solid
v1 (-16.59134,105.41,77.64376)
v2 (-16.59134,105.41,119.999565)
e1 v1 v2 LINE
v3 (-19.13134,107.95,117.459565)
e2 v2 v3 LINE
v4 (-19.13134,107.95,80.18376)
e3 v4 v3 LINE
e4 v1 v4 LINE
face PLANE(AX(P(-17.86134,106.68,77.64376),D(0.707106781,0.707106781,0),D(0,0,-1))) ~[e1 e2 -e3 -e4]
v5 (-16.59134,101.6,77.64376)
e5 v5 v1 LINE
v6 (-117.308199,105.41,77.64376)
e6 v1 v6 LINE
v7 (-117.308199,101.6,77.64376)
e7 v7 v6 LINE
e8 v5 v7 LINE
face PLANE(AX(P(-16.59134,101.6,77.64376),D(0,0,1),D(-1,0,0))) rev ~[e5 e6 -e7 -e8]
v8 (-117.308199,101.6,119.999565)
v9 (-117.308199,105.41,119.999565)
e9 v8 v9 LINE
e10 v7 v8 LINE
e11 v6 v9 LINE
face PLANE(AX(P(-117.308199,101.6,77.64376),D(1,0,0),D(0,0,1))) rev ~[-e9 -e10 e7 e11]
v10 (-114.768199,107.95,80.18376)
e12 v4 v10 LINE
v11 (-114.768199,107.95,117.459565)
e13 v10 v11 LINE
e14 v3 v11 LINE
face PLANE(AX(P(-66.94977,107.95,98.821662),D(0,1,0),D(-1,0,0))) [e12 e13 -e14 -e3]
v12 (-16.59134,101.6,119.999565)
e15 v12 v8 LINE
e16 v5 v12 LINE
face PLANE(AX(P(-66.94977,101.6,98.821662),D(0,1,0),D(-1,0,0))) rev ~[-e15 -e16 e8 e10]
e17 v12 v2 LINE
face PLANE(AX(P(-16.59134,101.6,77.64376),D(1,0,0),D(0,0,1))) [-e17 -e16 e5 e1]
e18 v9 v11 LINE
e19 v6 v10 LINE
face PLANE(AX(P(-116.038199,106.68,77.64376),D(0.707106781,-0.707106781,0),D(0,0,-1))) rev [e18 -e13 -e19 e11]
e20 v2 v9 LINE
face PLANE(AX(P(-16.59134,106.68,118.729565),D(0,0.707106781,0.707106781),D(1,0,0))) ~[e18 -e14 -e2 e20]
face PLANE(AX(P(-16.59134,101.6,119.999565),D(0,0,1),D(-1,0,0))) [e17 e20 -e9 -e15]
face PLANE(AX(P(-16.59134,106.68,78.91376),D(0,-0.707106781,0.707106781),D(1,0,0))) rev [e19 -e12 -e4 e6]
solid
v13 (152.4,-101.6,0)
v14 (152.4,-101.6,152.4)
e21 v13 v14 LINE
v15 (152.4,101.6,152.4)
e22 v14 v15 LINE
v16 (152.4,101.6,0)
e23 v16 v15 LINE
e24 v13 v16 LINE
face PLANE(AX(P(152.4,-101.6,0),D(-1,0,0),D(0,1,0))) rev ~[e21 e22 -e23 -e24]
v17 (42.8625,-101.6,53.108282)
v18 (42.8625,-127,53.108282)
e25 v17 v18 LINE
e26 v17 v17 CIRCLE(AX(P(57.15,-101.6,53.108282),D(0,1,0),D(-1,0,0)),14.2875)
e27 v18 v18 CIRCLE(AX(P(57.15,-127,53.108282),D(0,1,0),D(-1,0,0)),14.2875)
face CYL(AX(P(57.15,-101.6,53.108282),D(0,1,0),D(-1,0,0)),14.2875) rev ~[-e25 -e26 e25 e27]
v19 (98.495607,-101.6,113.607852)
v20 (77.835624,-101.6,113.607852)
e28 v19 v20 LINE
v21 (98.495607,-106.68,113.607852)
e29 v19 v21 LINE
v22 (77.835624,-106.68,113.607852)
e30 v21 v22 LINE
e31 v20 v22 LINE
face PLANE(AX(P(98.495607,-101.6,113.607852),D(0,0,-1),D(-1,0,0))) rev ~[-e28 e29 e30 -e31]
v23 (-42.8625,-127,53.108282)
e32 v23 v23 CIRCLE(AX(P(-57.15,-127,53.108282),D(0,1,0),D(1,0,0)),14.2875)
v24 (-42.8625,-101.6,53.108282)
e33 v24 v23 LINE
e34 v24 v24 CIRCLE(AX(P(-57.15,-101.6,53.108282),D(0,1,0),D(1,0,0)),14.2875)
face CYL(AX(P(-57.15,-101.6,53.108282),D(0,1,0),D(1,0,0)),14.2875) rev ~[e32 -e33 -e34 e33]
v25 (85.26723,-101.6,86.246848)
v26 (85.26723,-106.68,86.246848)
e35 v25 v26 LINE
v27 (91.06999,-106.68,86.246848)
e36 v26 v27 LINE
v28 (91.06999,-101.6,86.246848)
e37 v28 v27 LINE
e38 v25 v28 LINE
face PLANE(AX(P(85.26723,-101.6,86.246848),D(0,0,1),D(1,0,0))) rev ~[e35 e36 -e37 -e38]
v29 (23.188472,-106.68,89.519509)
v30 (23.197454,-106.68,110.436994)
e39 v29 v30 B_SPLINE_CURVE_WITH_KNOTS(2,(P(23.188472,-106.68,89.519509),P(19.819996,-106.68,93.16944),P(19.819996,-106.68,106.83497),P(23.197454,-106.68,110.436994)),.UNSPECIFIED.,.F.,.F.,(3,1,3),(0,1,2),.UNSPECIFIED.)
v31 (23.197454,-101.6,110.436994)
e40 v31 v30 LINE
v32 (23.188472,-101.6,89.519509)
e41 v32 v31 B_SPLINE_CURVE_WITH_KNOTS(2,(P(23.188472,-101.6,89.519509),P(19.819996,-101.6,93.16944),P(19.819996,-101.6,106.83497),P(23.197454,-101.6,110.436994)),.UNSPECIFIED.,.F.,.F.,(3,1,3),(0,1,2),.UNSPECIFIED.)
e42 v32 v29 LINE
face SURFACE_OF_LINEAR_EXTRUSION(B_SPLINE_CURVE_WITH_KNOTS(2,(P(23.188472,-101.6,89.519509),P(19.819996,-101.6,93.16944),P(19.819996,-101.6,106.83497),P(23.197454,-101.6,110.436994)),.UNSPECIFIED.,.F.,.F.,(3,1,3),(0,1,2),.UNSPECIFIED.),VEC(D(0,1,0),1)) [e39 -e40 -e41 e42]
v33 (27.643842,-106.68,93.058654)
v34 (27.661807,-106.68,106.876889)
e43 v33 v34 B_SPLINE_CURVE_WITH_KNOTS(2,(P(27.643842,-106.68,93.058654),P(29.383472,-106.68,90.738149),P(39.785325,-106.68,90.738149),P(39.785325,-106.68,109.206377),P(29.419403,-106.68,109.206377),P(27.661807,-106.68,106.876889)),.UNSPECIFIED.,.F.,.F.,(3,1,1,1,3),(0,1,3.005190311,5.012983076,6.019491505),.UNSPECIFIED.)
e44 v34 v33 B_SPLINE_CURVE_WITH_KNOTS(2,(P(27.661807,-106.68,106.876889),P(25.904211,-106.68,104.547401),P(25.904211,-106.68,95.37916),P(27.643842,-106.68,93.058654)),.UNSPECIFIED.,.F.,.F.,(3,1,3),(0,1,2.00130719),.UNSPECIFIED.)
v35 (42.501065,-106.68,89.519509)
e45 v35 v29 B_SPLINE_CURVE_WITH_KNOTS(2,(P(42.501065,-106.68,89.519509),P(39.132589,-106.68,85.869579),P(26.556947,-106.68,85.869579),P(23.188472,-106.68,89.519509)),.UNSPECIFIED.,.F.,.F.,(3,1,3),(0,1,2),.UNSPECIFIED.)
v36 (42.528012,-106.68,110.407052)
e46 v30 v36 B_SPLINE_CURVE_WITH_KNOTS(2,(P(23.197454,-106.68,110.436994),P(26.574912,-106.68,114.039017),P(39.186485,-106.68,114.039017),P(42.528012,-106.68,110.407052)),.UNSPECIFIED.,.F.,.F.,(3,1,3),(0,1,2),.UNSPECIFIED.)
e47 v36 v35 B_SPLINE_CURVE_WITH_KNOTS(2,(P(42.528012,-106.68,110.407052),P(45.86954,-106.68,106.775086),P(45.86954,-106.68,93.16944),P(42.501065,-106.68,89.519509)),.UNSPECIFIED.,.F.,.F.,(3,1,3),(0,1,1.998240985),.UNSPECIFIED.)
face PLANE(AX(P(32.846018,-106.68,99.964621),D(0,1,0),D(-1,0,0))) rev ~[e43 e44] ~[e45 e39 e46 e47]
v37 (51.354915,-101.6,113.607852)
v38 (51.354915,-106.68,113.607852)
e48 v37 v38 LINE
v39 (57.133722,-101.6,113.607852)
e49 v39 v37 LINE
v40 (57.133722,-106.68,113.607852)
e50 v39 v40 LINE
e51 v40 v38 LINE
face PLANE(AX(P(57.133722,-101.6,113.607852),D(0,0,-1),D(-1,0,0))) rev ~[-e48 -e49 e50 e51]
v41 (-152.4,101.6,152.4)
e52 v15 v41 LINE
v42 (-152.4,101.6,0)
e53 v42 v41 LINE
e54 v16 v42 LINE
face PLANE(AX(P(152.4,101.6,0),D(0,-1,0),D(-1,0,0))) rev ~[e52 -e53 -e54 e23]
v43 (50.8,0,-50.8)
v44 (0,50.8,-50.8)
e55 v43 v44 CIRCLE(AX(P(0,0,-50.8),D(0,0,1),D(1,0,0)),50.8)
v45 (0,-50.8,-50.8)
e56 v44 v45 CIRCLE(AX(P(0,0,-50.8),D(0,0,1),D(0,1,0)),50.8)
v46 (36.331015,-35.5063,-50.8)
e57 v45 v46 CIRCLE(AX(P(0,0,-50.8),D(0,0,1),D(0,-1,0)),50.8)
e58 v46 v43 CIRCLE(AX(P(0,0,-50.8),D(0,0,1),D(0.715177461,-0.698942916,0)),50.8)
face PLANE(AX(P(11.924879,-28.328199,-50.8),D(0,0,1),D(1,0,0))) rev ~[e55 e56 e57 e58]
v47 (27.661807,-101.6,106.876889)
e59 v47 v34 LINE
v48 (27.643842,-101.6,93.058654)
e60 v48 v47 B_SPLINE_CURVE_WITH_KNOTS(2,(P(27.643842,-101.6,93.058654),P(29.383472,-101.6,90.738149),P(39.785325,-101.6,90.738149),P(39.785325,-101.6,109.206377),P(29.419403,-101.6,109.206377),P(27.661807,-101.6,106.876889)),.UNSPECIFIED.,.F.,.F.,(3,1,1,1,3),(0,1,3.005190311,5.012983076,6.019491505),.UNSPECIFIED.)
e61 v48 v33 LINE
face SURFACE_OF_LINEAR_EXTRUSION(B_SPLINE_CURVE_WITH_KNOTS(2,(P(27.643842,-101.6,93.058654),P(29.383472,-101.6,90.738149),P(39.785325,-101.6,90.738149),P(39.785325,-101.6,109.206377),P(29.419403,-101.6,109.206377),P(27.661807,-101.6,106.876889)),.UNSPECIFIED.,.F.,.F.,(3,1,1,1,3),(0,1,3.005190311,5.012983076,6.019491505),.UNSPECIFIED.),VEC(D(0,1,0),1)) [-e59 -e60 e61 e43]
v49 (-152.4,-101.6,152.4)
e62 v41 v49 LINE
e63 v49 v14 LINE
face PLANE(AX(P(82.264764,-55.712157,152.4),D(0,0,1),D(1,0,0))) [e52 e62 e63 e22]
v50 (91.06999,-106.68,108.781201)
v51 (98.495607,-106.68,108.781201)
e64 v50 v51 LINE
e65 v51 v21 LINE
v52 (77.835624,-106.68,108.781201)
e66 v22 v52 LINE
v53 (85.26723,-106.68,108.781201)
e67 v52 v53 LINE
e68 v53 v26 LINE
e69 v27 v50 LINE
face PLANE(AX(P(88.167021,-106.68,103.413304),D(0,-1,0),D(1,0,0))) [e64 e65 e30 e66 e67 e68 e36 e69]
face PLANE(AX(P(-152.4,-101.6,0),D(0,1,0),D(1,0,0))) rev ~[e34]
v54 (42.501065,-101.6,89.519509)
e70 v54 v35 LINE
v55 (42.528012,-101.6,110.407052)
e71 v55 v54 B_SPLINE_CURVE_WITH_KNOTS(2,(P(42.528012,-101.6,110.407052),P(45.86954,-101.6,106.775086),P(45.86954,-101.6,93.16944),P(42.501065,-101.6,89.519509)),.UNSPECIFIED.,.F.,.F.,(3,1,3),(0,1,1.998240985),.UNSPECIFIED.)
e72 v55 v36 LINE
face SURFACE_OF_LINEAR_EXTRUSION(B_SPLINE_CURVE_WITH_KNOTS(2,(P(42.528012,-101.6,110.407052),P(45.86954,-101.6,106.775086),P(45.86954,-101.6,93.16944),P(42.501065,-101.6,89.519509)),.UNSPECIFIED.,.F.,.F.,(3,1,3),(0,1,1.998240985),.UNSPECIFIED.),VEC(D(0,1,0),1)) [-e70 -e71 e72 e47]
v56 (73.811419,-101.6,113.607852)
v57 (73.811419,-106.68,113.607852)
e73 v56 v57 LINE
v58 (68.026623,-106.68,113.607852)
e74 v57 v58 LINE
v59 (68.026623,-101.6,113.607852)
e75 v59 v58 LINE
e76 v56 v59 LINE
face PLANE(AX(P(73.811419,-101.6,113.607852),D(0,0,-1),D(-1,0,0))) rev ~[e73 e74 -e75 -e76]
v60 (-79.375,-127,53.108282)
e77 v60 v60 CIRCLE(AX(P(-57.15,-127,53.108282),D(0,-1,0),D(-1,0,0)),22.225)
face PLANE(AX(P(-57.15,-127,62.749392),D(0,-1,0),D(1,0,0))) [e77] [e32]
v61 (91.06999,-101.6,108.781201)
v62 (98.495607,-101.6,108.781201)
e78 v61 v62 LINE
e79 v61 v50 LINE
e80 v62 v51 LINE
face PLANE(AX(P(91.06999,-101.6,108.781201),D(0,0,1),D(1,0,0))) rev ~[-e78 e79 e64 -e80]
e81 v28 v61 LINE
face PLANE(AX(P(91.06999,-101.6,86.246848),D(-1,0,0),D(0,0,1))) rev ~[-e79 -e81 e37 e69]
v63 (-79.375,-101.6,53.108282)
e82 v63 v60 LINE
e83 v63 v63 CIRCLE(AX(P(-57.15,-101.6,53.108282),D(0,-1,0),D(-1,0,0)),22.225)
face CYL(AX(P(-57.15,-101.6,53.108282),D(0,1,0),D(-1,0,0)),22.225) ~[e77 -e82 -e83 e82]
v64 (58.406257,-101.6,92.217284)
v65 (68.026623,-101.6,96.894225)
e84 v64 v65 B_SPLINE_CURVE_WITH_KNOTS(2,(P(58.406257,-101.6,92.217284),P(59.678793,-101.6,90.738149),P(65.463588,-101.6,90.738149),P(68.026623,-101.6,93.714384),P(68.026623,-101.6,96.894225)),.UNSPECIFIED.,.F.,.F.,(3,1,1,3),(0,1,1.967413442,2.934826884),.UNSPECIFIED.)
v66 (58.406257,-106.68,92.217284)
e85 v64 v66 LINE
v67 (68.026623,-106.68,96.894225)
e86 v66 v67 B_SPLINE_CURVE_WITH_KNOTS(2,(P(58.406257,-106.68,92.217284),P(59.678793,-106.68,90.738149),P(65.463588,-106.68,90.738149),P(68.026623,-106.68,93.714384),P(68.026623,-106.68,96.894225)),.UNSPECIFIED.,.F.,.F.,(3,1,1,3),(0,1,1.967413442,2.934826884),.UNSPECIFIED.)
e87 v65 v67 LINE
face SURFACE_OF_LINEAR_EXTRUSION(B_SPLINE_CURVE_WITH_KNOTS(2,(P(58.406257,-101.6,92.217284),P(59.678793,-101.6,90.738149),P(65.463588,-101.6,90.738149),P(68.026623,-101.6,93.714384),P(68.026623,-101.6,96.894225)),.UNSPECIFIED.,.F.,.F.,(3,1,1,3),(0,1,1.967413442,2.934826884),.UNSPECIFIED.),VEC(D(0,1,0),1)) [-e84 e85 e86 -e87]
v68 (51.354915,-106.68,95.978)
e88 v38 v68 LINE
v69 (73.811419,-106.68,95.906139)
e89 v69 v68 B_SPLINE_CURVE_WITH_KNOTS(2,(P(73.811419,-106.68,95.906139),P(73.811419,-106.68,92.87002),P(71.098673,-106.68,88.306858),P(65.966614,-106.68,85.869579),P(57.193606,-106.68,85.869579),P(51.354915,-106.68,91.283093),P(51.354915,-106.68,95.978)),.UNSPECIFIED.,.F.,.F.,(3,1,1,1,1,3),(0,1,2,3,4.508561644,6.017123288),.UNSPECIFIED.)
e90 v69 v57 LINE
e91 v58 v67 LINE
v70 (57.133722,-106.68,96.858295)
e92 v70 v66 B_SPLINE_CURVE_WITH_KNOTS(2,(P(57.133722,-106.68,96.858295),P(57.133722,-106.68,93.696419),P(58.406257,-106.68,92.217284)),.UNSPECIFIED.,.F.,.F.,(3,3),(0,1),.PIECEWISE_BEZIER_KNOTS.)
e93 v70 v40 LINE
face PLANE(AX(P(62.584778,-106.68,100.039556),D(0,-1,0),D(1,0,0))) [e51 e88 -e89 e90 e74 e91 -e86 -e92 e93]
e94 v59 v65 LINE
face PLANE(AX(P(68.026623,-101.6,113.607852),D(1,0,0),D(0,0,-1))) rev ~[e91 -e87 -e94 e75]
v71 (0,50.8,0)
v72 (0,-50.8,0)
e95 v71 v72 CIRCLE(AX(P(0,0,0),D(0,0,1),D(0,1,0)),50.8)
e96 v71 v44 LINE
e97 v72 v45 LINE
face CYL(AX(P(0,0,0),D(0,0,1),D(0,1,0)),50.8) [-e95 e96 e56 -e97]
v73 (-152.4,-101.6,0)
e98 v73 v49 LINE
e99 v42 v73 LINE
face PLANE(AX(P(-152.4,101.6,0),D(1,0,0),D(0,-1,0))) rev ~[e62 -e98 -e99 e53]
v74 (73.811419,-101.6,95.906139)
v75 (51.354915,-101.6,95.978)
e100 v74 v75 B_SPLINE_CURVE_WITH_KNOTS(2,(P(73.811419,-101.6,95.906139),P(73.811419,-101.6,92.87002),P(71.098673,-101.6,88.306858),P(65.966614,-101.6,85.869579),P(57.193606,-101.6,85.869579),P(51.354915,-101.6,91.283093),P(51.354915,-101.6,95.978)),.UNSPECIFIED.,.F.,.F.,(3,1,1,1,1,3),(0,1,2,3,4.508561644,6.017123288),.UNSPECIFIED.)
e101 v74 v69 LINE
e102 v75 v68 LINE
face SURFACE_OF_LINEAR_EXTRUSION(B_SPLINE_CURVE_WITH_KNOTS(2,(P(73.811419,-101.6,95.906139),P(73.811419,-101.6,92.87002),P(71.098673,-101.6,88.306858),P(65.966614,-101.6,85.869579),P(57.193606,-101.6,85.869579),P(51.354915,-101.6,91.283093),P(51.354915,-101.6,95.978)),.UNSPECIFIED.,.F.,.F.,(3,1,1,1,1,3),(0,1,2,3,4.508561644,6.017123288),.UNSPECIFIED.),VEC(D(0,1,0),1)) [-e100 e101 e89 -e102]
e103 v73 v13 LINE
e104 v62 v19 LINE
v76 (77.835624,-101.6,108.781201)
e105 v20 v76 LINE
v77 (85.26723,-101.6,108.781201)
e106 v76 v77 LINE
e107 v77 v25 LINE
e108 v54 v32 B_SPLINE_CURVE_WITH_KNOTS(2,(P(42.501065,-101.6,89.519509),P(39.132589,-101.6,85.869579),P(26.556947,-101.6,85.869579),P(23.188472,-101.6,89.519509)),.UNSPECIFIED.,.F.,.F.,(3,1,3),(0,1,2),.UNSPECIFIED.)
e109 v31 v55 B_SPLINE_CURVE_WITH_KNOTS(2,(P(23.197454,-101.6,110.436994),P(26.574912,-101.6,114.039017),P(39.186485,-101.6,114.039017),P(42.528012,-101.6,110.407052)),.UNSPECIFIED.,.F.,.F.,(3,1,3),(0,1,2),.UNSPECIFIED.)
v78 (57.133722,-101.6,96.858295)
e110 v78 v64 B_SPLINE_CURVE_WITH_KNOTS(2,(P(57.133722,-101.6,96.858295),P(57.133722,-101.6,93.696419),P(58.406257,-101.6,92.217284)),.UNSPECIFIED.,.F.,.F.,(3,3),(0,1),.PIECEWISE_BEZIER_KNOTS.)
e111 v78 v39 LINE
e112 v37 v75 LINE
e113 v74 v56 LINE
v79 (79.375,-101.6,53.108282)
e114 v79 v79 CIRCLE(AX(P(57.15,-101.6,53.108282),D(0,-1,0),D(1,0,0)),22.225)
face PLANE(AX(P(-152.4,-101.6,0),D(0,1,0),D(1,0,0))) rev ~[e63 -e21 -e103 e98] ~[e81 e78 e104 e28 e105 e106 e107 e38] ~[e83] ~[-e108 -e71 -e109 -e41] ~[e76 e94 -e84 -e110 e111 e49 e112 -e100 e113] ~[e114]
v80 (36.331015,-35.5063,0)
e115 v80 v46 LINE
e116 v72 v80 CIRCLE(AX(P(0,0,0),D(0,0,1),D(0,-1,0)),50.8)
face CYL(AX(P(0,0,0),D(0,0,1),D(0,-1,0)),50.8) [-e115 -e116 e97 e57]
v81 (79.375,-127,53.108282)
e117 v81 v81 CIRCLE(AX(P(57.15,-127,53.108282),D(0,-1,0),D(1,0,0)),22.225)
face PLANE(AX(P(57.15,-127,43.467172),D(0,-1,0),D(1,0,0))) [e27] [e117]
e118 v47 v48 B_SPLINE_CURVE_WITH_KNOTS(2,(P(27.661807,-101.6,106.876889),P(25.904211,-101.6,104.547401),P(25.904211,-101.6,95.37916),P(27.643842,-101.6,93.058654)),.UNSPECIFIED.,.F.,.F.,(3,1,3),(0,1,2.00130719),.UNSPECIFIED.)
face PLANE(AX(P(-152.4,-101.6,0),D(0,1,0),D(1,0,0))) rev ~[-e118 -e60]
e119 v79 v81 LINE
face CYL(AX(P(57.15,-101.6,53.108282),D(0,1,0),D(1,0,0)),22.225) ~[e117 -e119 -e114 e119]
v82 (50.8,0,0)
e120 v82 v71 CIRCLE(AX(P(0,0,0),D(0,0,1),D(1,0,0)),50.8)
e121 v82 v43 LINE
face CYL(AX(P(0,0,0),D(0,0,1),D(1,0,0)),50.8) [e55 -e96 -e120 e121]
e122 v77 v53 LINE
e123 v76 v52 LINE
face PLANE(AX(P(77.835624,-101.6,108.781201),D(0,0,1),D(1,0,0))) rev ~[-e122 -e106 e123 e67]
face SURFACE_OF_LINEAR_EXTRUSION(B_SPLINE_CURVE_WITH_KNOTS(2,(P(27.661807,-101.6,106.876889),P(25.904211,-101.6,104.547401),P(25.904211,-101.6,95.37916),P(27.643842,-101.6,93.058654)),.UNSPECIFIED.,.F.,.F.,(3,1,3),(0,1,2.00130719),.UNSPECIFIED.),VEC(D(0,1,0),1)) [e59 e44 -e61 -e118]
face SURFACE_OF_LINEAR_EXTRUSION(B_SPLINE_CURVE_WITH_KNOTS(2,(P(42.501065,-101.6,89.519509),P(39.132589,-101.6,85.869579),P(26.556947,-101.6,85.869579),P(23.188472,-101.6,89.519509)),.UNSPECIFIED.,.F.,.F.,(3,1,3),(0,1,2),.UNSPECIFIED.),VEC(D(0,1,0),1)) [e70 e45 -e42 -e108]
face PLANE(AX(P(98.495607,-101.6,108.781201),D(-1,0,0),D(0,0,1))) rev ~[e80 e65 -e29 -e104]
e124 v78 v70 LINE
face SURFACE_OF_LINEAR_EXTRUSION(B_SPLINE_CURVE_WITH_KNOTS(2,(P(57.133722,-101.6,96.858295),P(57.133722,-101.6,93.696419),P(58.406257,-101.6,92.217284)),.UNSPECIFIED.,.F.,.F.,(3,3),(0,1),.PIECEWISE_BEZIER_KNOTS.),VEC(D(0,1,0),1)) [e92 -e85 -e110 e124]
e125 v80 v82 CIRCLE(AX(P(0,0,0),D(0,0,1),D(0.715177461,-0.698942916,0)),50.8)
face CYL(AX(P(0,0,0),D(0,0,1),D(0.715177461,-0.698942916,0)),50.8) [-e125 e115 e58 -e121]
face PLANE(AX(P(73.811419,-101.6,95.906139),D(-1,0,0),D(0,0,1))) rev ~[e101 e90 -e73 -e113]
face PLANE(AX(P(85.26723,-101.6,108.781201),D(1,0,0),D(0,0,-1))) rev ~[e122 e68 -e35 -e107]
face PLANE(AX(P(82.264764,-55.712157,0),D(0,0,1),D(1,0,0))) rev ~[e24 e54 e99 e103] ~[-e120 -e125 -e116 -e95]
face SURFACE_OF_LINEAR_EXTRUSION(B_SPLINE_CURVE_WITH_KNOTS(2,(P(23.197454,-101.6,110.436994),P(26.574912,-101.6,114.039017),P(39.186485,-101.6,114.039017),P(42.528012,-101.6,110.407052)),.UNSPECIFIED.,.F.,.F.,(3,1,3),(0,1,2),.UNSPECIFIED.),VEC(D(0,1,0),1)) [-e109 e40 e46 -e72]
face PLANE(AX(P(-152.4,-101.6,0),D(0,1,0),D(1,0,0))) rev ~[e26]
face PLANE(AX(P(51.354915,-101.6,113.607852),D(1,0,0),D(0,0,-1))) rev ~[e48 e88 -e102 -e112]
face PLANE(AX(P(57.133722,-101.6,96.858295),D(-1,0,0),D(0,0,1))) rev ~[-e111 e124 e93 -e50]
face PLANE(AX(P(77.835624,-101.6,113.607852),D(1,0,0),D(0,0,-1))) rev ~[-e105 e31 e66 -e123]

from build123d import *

# Parameters (mm, degrees)
F1_DEPTH  = 152.4
F2_DEPTH  = 50.8
F4_DEPTH  = 25.4
F5_W      = 100.7168591022
F5_H      = 42.3558056355
F6_DEPTH  = 6.35
F7_SIZE   = 2.54
F10_DEPTH = 5.08


with BuildPart() as f1:
    # F0 (on Top) → F1 (new body)
    with BuildSketch(Plane.XY):
        with BuildLine():
            Line((152.4, 0), (50.8, 0))
            ThreePointArc((50.8, 0), (47.0438920676, -19.1706082098), (36.3310149947, -35.5063001375))
            ThreePointArc((36.3310149947, -35.5063001375), (19.7093880297, -46.820722159), (0, -50.8))
            Line((0, -50.8), (0, -101.6))
            Line((0, -101.6), (152.4, -101.6))
            Line((152.4, -101.6), (152.4, 0))
        make_face()
        with BuildLine():
            ThreePointArc((0, 50.8), (35.9210244843, 35.9210244843), (50.8, 0))
            Line((50.8, 0), (152.4, 0))
            Line((152.4, 0), (152.4, 101.6))
            Line((152.4, 101.6), (0, 101.6))
            Line((0, 101.6), (0, 50.8))
        make_face()
        with BuildLine():
            ThreePointArc((0, -50.8), (-50.8, 0), (0, 50.8))
            Line((0, 50.8), (0, 101.6))
            Line((0, 101.6), (-152.4, 101.6))
            Line((-152.4, 101.6), (-152.4, -101.6))
            Line((-152.4, -101.6), (0, -101.6))
            Line((0, -101.6), (0, -50.8))
        make_face()
        with BuildLine():
            Line((0, -50.8), (0, 0))
            Line((0, 0), (0, 50.8))
            ThreePointArc((0, 50.8), (-50.8, 0), (0, -50.8))
        make_face()
        with BuildLine():
            Line((0, 50.8), (0, 0))
            Line((0, 0), (50.8, 0))
            ThreePointArc((50.8, 0), (35.9210244843, 35.9210244843), (0, 50.8))
        make_face()
        with BuildLine():
            Line((36.3310149947, -35.5063001375), (0, 0))
            Line((0, 0), (0, -50.8))
            ThreePointArc((0, -50.8), (19.7093880297, -46.820722159), (36.3310149947, -35.5063001375))
        make_face()
        with BuildLine():
            Line((50.8, 0), (0, 0))
            Line((0, 0), (36.3310149947, -35.5063001375))
            ThreePointArc((36.3310149947, -35.5063001375), (47.0438920676, -19.1706082098), (50.8, 0))
        make_face()
    extrude(amount=F1_DEPTH)

    # F0 (on Top) → F2 (join)
    with BuildSketch(Plane.XY):
        with BuildLine():
            Line((36.3310149947, -35.5063001375), (0, 0))
            Line((0, 0), (0, -50.8))
            ThreePointArc((0, -50.8), (19.7093880297, -46.820722159), (36.3310149947, -35.5063001375))
        make_face()
        with BuildLine():
            Line((50.8, 0), (0, 0))
            Line((0, 0), (36.3310149947, -35.5063001375))
            ThreePointArc((36.3310149947, -35.5063001375), (47.0438920676, -19.1706082098), (50.8, 0))
        make_face()
        with BuildLine():
            Line((0, 50.8), (0, 0))
            Line((0, 0), (50.8, 0))
            ThreePointArc((50.8, 0), (35.9210244843, 35.9210244843), (0, 50.8))
        make_face()
        with BuildLine():
            Line((0, -50.8), (0, 0))
            Line((0, 0), (0, 50.8))
            ThreePointArc((0, 50.8), (-50.8, 0), (0, -50.8))
        make_face()
    extrude(amount=-F2_DEPTH)

    # F3 (on face) → F4 (join)
    with BuildSketch(Plane.XZ.offset(101.6)):
        with BuildLine():
            ThreePointArc((34.925, 53.1082823873), (57.15, 30.8832823873), (79.375, 53.1082823873))
            Line((79.375, 53.1082823873), (71.4375, 53.1082823873))
            ThreePointArc((71.4375, 53.1082823873), (57.15, 38.8207823873), (42.8625, 53.1082823873))
            Line((42.8625, 53.1082823873), (34.925, 53.1082823873))
        make_face()
        with BuildLine():
            Line((71.4375, 53.1082823873), (79.375, 53.1082823873))
            ThreePointArc((79.375, 53.1082823873), (57.15, 75.3332823873), (34.925, 53.1082823873))
            Line((34.925, 53.1082823873), (42.8625, 53.1082823873))
            ThreePointArc((42.8625, 53.1082823873), (57.15, 67.3957823873), (71.4375, 53.1082823873))
        make_face()
        with BuildLine():
            ThreePointArc((-34.925, 53.1082823873), (-57.15, 75.3332823873), (-79.375, 53.1082823873))
            Line((-79.375, 53.1082823873), (-71.4375, 53.1082823873))
            ThreePointArc((-71.4375, 53.1082823873), (-57.15, 67.3957823873), (-42.8625, 53.1082823873))
            Line((-42.8625, 53.1082823873), (-34.925, 53.1082823873))
        make_face()
        with BuildLine():
            Line((-71.4375, 53.1082823873), (-79.375, 53.1082823873))
            ThreePointArc((-79.375, 53.1082823873), (-57.15, 30.8832823873), (-34.925, 53.1082823873))
            Line((-34.925, 53.1082823873), (-42.8625, 53.1082823873))
            ThreePointArc((-42.8625, 53.1082823873), (-57.15, 38.8207823873), (-71.4375, 53.1082823873))
        make_face()
    extrude(amount=F4_DEPTH)

    # F9 (on face) + F8 (on face) → F10 (join)
    with BuildSketch(Plane.XZ.offset(101.6)):
        Polygon((91.0699902064, 86.2468481064), (91.0699902064, 108.7812007722), (98.4956073484, 108.7812007722), (98.4956073484, 113.6078519145), (77.8356241709, 113.6078519145), (77.8356241709, 108.7812007722), (85.2672297139, 108.7812007722), (85.2672297139, 86.2468481064), align=None)
        with BuildLine():
            Line((73.811418752, 113.6078519145), (68.0266234623, 113.6078519145))
            Line((68.0266234623, 113.6078519145), (68.0266234623, 96.894224944))
            add(Edge.make_bspline(
                [(66.7451056652, 92.226266426), (68.0266234623, 93.7143840549), (68.0266234623, 96.894224944)],
                knots=[0, 0, 0, 1, 1, 1], degree=2))
            add(Edge.make_bspline(
                [(62.6190974306, 90.7381487971), (65.4635878681, 90.7381487971), (66.7451056652, 92.226266426)],
                knots=[0, 0, 0, 1, 1, 1], degree=2))
            add(Edge.make_bspline(
                [(58.4062573827, 92.2172838246), (59.6787925784, 90.7381487971), (62.6190974306, 90.7381487971)],
                knots=[0, 0, 0, 1, 1, 1], degree=2))
            add(Edge.make_bspline(
                [(57.1337221869, 96.8582945384), (57.1337221869, 93.6964188521), (58.4062573827, 92.2172838246)],
                knots=[0, 0, 0, 1, 1, 1], degree=2))
            Line((57.1337221869, 96.8582945384), (57.1337221869, 113.6078519145))
            Line((57.1337221869, 113.6078519145), (51.3549152982, 113.6078519145))
            Line((51.3549152982, 113.6078519145), (51.3549152982, 95.977999603))
            add(Edge.make_bspline(
                [(54.2742607472, 88.5763360647), (51.3549152982, 91.283093281), (51.3549152982, 95.977999603)],
                knots=[0, 0, 0, 1, 1, 1], degree=2))
            add(Edge.make_bspline(
                [(62.4693874076, 85.8695788484), (57.1936061962, 85.8695788484), (54.2742607472, 88.5763360647)],
                knots=[0, 0, 0, 1, 1, 1], degree=2))
            add(Edge.make_bspline(
                [(68.5326433401, 87.0882184358), (65.9666135454, 85.8695788484), (62.4693874076, 85.8695788484)],
                knots=[0, 0, 0, 1, 1, 1], degree=2))
            add(Edge.make_bspline(
                [(72.4550459434, 90.5884387741), (71.0986731348, 88.3068580232), (68.5326433401, 87.0882184358)],
                knots=[0, 0, 0, 1, 1, 1], degree=2))
            add(Edge.make_bspline(
                [(73.811418752, 95.906138792), (73.811418752, 92.870019525), (72.4550459434, 90.5884387741)],
                knots=[0, 0, 0, 1, 1, 1], degree=2))
            Line((73.811418752, 95.906138792), (73.811418752, 113.6078519145))
        make_face()
    with BuildSketch(Plane.XZ.offset(101.6)):
        with BuildLine():
            add(Edge.make_bspline(
                [(45.8695400545, 99.9662746164), (45.8695400545, 93.1694395711), (42.5010645364, 89.5195092097)],
                knots=[0, 0, 0, 1, 1, 1], degree=2))
            add(Edge.make_bspline(
                [(42.5280123406, 110.4070516222), (45.8695400545, 106.7750864636), (45.8695400545, 99.9662746164)],
                knots=[0, 0, 0, 1, 1, 1], degree=2))
            add(Edge.make_bspline(
                [(32.8806984568, 114.0390167808), (39.1864846266, 114.0390167808), (42.5280123406, 110.4070516222)],
                knots=[0, 0, 0, 1, 1, 1], degree=2))
            add(Edge.make_bspline(
                [(23.1974541675, 110.4369936268), (26.574912287, 114.0390167808), (32.8806984568, 114.0390167808)],
                knots=[0, 0, 0, 1, 1, 1], degree=2))
            add(Edge.make_bspline(
                [(19.8199960481, 100.002205022), (19.8199960481, 106.8349704728), (23.1974541675, 110.4369936268)],
                knots=[0, 0, 0, 1, 1, 1], degree=2))
            add(Edge.make_bspline(
                [(23.1884715661, 89.5195092097), (19.8199960481, 93.1694395711), (19.8199960481, 100.002205022)],
                knots=[0, 0, 0, 1, 1, 1], degree=2))
            add(Edge.make_bspline(
                [(32.8447680513, 85.8695788484), (26.5569470842, 85.8695788484), (23.1884715661, 89.5195092097)],
                knots=[0, 0, 0, 1, 1, 1], degree=2))
            add(Edge.make_bspline(
                [(42.5010645364, 89.5195092097), (39.1325890184, 85.8695788484), (32.8447680513, 85.8695788484)],
                knots=[0, 0, 0, 1, 1, 1], degree=2))
        make_face()
        with BuildLine():
            add(Edge.make_bspline(
                [(25.9042113838, 99.9662746164), (25.9042113838, 95.3791595109), (27.6438418514, 93.058654154)],
                knots=[0, 0, 0, 1, 1, 1], degree=2))
            add(Edge.make_bspline(
                [(27.6618070541, 106.8768892793), (25.9042113838, 104.547401321), (25.9042113838, 99.9662746164)],
                knots=[0, 0, 0, 1, 1, 1], degree=2))
            add(Edge.make_bspline(
                [(32.8806984568, 109.2063772376), (29.4194027245, 109.2063772376), (27.6618070541, 106.8768892793)],
                knots=[0, 0, 0, 1, 1, 1], degree=2))
            add(Edge.make_bspline(
                [(39.7853247188, 99.9662746164), (39.7853247188, 109.2063772376), (32.8806984568, 109.2063772376)],
                knots=[0, 0, 0, 1, 1, 1], degree=2))
            add(Edge.make_bspline(
                [(32.8447680513, 90.7381487971), (39.7853247188, 90.7381487971), (39.7853247188, 99.9662746164)],
                knots=[0, 0, 0, 1, 1, 1], degree=2))
            add(Edge.make_bspline(
                [(27.6438418514, 93.058654154), (29.3834723189, 90.7381487971), (32.8447680513, 90.7381487971)],
                knots=[0, 0, 0, 1, 1, 1], degree=2))
        make_face(mode=Mode.SUBTRACT)
    extrude(amount=F10_DEPTH)


with BuildPart() as f6:
    # F5 (on face) → F6 (new body)
    with BuildSketch(Plane(origin=(0, 101.6, 0), x_dir=(-1, 0, 0), z_dir=(0, 1, 0))):
        with Locations((66.9497698545, 98.8216623664)):
            Rectangle(F5_W, F5_H)
    extrude(amount=F6_DEPTH)

    # F7
    f7_edges = [f6.edges().sort_by_distance(p)[0] for p in [
        (-66.94977, 107.95, 119.999565),
        (-117.308199, 107.95, 98.821662),
        (-16.59134, 107.95, 98.821662),
        (-66.94977, 107.95, 77.64376),
    ]]
    chamfer(f7_edges, length=F7_SIZE)


solid = Compound([f1.part, f6.part])
